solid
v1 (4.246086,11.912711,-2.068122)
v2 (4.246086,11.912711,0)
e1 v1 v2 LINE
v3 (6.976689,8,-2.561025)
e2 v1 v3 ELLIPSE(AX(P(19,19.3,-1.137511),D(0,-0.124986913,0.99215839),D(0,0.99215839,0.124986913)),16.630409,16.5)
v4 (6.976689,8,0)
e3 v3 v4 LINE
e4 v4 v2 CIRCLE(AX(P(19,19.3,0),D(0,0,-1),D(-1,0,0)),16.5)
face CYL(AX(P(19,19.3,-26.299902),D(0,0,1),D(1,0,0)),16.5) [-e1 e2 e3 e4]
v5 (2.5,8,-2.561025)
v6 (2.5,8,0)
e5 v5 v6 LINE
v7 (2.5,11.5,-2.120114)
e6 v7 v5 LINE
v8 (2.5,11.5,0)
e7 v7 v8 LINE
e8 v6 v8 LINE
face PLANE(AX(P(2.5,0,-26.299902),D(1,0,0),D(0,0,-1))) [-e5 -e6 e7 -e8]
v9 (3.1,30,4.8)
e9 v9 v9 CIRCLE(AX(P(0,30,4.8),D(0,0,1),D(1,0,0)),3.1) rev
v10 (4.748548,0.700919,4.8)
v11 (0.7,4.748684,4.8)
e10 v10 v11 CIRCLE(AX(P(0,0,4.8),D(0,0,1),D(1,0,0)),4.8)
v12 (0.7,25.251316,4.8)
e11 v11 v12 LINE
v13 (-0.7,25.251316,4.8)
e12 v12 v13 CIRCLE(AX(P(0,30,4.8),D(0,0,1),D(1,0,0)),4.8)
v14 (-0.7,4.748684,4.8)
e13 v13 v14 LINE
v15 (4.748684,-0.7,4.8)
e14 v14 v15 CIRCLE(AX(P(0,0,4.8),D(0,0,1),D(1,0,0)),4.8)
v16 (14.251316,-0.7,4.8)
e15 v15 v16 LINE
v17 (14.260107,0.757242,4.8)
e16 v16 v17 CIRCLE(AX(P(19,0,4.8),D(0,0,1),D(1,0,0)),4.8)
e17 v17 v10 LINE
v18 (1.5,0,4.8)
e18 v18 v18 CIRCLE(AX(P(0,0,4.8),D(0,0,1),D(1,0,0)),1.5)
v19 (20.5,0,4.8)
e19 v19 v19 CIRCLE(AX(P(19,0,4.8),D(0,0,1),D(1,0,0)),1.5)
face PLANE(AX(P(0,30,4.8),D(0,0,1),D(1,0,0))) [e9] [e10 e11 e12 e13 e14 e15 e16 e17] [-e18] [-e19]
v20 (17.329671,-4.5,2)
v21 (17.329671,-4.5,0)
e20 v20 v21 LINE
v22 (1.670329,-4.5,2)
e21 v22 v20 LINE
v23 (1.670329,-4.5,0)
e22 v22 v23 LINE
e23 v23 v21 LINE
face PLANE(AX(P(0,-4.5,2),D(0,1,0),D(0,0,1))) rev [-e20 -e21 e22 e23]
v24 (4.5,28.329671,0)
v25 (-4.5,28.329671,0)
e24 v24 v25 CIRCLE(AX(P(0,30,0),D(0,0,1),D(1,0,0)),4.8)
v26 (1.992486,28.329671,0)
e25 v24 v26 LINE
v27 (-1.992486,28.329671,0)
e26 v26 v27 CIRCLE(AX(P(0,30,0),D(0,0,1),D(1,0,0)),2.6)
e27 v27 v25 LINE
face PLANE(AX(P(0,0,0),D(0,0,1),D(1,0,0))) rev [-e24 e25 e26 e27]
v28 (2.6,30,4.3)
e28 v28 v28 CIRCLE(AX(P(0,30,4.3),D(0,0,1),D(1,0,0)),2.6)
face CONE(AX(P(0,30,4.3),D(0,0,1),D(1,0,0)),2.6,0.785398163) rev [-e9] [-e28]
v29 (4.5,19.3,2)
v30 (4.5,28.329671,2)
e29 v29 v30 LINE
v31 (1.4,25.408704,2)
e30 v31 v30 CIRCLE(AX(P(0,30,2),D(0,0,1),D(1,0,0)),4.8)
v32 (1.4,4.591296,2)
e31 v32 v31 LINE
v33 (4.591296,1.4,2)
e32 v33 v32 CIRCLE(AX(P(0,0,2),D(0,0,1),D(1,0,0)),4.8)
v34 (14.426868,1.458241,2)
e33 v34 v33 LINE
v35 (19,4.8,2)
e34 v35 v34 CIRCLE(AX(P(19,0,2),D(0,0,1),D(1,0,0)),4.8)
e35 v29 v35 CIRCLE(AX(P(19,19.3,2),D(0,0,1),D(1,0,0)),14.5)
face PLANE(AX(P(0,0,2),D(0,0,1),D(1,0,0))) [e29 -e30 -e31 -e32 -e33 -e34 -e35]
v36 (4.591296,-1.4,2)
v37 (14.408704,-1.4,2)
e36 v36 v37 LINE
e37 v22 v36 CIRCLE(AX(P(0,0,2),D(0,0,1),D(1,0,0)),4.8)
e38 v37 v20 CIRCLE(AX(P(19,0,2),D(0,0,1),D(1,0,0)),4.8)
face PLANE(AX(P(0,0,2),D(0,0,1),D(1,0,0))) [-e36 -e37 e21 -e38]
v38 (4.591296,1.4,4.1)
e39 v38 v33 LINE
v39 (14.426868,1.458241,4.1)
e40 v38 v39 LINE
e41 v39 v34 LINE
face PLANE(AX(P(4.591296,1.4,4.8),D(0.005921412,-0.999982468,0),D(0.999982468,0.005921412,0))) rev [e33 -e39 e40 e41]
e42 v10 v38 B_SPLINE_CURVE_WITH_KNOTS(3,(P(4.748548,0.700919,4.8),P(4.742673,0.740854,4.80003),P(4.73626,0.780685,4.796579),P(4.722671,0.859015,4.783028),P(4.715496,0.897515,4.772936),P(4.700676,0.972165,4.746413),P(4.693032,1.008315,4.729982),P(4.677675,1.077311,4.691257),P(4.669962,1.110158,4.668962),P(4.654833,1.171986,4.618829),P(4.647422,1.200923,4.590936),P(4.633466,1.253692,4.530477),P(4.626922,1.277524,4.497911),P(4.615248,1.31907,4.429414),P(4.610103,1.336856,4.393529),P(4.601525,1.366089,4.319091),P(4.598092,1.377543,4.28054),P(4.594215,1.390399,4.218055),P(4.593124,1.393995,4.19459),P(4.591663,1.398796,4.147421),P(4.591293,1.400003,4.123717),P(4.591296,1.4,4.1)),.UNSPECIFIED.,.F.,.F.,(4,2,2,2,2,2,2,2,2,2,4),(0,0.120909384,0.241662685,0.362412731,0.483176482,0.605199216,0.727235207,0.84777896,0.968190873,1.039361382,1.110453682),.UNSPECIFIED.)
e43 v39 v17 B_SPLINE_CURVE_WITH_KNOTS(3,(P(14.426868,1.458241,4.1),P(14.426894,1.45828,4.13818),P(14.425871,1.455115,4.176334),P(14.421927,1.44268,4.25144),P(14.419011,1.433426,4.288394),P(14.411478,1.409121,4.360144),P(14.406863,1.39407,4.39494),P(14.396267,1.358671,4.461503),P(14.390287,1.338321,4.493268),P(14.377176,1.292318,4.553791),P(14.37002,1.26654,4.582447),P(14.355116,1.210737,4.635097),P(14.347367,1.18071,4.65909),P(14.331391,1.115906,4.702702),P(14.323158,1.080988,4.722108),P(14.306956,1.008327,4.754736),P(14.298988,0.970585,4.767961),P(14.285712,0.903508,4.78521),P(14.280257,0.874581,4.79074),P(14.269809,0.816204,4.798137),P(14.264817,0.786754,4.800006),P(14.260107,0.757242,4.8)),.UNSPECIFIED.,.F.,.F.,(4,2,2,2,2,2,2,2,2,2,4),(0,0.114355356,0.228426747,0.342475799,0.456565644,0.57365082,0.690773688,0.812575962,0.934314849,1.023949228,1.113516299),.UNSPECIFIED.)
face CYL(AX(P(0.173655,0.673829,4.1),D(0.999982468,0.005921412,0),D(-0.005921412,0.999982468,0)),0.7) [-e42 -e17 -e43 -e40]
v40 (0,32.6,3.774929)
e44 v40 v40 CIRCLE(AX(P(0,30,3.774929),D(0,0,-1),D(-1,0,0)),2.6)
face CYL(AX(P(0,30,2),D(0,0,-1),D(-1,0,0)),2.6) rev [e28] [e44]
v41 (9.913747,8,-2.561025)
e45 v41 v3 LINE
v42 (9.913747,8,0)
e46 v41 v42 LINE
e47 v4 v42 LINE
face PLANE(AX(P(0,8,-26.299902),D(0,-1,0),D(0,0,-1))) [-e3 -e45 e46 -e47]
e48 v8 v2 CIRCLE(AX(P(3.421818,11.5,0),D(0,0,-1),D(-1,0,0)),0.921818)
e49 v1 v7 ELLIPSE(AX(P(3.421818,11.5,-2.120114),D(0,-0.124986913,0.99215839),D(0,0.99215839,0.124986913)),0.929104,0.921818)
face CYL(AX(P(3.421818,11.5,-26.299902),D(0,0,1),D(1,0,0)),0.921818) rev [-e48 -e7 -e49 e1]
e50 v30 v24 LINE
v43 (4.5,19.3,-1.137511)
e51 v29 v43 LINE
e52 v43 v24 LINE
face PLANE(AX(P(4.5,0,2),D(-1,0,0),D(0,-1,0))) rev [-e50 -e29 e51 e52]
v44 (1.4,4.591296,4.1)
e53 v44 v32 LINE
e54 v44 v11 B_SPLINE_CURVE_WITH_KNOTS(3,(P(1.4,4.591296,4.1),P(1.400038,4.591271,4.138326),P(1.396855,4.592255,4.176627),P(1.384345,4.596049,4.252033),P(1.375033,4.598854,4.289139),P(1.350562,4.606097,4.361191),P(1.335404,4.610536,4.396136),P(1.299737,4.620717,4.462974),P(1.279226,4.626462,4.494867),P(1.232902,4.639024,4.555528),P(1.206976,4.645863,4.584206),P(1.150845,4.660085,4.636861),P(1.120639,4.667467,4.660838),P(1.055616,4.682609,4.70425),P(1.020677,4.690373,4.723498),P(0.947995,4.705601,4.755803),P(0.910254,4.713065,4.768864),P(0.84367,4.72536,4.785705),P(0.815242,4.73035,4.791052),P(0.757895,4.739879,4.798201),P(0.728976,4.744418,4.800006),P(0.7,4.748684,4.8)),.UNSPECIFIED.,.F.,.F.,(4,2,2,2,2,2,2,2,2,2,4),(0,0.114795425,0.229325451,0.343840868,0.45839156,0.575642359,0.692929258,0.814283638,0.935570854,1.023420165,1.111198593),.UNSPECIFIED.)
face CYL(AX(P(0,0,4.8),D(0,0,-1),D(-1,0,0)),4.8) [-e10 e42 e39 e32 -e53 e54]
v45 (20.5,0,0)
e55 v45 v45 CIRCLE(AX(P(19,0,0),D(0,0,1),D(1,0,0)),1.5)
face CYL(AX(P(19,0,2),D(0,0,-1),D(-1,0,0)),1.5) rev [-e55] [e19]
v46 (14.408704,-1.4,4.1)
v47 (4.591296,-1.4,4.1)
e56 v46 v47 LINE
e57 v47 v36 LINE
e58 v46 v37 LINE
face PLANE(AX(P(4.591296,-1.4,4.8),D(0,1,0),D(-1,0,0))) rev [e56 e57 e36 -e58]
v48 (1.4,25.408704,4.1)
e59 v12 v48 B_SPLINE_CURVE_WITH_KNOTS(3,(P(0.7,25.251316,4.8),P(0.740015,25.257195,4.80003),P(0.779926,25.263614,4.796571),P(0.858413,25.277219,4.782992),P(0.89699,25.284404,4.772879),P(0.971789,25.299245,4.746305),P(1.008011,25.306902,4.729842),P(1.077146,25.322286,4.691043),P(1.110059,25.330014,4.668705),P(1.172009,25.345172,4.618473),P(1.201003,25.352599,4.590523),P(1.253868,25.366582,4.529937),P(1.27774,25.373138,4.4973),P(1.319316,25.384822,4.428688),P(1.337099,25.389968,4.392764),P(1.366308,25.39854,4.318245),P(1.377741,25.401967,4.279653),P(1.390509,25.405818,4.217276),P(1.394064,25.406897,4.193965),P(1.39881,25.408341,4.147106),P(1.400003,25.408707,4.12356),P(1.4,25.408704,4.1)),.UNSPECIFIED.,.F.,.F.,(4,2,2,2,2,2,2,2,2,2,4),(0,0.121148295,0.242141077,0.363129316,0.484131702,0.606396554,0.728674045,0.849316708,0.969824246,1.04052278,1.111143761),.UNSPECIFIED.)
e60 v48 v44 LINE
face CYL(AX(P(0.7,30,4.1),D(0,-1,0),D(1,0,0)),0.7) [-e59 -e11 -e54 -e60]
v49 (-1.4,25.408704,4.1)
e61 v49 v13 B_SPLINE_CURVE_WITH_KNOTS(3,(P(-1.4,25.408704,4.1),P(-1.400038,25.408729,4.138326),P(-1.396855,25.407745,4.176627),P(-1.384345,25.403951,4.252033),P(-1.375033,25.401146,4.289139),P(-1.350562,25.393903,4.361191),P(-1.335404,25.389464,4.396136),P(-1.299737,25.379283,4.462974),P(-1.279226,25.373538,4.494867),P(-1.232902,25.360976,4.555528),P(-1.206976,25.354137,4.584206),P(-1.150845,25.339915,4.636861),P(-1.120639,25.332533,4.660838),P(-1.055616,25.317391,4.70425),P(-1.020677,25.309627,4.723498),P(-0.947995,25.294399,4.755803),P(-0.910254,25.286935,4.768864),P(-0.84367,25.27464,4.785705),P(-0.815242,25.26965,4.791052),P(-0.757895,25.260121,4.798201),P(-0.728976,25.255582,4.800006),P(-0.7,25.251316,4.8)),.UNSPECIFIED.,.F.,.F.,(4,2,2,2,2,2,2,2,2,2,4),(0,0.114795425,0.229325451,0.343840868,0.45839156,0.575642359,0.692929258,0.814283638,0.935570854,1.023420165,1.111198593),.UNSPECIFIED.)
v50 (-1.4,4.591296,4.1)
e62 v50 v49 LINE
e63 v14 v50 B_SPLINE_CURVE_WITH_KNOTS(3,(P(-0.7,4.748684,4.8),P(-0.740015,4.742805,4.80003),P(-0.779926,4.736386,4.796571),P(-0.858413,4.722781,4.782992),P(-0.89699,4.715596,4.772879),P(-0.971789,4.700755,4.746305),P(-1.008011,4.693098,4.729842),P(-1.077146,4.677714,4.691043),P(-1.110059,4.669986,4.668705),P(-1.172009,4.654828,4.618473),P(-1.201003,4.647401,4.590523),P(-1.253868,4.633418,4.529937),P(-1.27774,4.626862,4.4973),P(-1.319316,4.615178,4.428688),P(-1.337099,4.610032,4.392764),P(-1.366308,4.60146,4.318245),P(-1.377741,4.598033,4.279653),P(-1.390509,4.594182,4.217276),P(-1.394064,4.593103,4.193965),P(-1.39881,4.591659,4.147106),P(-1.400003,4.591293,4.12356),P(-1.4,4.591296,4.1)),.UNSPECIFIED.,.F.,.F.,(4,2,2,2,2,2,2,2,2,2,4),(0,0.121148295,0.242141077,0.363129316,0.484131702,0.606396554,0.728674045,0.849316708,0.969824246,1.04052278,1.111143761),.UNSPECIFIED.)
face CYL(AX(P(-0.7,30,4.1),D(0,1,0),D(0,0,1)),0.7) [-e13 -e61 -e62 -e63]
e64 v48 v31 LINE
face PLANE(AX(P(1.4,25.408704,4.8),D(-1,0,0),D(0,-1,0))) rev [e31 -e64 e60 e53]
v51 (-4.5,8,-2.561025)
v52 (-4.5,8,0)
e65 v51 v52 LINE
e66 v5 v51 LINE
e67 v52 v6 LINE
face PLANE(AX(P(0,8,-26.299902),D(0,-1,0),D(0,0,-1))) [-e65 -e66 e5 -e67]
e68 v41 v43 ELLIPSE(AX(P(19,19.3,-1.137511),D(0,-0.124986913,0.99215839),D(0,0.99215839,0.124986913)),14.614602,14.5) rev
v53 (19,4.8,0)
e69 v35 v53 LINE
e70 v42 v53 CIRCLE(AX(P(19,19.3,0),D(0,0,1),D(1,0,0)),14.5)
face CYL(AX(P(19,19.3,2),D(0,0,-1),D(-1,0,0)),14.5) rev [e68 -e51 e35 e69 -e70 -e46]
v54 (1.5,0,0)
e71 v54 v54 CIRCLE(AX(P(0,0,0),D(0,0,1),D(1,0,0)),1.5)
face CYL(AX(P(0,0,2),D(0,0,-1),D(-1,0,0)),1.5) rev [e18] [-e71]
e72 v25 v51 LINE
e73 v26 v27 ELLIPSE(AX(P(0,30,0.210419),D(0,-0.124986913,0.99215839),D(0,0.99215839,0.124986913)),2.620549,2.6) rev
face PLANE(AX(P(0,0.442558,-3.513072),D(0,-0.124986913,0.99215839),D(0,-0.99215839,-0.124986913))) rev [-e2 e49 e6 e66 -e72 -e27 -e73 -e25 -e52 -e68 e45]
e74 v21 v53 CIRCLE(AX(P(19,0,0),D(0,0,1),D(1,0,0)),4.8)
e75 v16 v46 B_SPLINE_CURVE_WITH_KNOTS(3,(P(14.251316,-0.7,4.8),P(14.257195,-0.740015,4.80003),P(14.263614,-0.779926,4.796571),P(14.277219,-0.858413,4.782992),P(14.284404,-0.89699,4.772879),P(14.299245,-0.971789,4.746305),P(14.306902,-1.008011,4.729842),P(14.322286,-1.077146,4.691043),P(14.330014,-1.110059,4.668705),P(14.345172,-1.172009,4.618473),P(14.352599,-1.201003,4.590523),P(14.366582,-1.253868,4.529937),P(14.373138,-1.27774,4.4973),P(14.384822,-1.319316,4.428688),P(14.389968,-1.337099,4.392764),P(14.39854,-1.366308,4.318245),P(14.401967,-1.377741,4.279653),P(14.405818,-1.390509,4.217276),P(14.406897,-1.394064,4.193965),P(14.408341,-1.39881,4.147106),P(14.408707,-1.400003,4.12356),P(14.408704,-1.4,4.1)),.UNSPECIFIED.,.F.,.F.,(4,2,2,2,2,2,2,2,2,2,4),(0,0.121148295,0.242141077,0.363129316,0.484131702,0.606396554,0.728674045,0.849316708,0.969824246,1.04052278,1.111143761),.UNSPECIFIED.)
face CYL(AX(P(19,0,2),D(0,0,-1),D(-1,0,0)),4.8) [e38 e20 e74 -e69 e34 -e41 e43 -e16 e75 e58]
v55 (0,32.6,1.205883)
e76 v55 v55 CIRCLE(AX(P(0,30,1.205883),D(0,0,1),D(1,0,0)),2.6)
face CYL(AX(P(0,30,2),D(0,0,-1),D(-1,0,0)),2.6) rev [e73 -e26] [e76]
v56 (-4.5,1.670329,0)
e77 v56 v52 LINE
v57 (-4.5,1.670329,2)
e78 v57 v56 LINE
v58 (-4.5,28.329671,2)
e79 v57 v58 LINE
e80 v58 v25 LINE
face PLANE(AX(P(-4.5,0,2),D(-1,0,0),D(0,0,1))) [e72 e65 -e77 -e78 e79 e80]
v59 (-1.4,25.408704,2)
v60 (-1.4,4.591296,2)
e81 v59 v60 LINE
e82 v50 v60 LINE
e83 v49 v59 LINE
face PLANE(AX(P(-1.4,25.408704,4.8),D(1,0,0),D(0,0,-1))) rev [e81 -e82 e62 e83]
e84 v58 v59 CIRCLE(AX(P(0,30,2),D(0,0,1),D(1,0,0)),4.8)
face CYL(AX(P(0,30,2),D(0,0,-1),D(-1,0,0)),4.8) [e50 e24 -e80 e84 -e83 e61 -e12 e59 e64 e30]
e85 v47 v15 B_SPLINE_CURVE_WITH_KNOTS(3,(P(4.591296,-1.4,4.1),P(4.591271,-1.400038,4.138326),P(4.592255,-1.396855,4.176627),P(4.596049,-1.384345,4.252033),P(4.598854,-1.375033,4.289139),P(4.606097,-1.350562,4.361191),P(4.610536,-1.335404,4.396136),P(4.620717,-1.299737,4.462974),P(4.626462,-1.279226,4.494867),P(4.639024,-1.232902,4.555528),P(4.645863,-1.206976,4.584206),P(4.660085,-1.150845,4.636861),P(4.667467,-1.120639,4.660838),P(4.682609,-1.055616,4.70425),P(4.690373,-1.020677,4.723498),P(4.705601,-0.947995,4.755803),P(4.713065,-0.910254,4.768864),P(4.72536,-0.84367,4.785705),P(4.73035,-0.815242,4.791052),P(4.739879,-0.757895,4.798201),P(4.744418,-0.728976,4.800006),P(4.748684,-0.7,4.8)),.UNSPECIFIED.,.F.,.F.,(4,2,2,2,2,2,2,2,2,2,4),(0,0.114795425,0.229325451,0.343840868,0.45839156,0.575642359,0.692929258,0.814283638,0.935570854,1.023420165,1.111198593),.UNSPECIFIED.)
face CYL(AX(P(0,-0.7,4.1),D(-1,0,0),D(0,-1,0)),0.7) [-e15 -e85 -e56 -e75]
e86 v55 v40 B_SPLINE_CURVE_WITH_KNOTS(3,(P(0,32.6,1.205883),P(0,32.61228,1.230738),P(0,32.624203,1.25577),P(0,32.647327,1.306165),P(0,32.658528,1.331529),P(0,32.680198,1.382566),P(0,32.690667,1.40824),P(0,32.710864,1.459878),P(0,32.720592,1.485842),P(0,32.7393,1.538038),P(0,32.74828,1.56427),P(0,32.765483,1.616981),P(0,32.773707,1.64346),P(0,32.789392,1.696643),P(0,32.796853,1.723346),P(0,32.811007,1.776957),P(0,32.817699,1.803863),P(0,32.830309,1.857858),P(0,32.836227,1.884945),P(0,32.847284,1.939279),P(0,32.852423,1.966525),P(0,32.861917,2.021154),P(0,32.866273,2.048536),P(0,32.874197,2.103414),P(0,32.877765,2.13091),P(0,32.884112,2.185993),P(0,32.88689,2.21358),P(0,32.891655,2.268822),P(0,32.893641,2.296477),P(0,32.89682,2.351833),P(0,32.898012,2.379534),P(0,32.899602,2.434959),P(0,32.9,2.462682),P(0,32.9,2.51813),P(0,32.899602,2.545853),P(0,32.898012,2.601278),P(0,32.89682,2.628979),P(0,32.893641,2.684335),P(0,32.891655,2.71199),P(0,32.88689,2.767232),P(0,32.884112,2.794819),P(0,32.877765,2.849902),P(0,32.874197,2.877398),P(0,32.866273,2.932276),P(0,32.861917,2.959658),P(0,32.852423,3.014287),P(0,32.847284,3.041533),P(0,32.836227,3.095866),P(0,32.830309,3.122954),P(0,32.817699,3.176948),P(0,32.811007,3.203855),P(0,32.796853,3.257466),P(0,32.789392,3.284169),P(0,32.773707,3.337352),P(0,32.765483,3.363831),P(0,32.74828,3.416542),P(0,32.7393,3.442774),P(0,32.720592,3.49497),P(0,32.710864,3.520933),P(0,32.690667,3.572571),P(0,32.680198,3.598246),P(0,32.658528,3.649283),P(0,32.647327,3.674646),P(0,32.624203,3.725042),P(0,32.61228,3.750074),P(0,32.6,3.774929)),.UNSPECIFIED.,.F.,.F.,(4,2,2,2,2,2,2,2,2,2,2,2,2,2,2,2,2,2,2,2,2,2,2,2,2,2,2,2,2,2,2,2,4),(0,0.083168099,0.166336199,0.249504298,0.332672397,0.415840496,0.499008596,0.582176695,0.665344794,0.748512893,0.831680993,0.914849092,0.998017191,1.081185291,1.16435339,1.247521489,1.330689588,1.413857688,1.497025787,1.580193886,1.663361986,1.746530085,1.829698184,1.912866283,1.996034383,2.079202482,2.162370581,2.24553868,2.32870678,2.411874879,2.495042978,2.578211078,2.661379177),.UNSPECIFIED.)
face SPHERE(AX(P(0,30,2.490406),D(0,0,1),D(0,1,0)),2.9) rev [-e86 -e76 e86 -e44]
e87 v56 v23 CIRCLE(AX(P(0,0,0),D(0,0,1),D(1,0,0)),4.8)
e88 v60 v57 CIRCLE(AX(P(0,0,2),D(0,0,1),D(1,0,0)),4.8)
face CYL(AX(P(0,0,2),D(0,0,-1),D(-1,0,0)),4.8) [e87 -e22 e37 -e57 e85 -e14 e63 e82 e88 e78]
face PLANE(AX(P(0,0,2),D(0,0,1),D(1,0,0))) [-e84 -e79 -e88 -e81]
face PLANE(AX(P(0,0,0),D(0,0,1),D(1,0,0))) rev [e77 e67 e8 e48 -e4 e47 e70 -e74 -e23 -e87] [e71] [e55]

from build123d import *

# Parameters (mm, degrees)
SKETCH_1_R            = 1.5
SKETCH_1_R_2          = 2.6
EXTRUDE_1_DEPTH       = 2
SKETCH_2_R            = 1.5
SKETCH_2_R_2          = 2.6
EXTRUDE_2_DEPTH       = 2.8
FILLET_1_R            = 0.7
EXTRUDE_START         = -4.5
EXTRUDE_3_DEPTH       = 7
EXTRUDE_START_2       = 2.5
EXTRUDE_3_2_DEPTH     = 7.413746647
EXTRUDE_START_3       = -4
EXTRUDE_3_3_OUTLINE_R = 1.5
EXTRUDE_3_3_DEPTH     = 4
CHAMFER_1_SIZE        = 0.5


with BuildPart() as part:
    # 草图1 → 凸台-拉伸1 (new body)
    with BuildSketch(Plane.XY):
        with BuildLine():
            Line((4.5, 19.3), (4.5, 28.329670691))
            ThreePointArc((4.5, 28.329670691), (0, 34.8), (-4.5, 28.329670691))
            Line((-4.5, 28.329670691), (-4.5, 1.670329309))
            ThreePointArc((-4.5, 1.670329309), (-3.39411255, -3.39411255), (1.670329309, -4.5))
            Line((1.670329309, -4.5), (17.329670691, -4.5))
            ThreePointArc((17.329670691, -4.5), (23.724404724, -0.848528137), (19, 4.8))
            ThreePointArc((19, 4.8), (8.746951673, 9.046951673), (4.5, 19.3))
        make_face()
        Circle(SKETCH_1_R, mode=Mode.SUBTRACT)
        with Locations((19, 0)):
            Circle(SKETCH_1_R, mode=Mode.SUBTRACT)
        with Locations((0, 30)):
            Circle(SKETCH_1_R_2, mode=Mode.SUBTRACT)
    extrude(amount=EXTRUDE_1_DEPTH)

    # 草图2 → 凸台-拉伸2 (add)
    with BuildSketch(Plane.XY.offset(2)):
        with BuildLine():
            Line((-1.4, 25.408703887), (-1.4, 4.591296113))
            ThreePointArc((-1.4, 4.591296113), (-3.39411255, -3.39411255), (4.591296113, -1.4))
            Line((4.591296113, -1.4), (14.408703887, -1.4))
            ThreePointArc((14.408703887, -1.4), (23.799903071, -0.030504201), (14.426868498, 1.458241497))
            Line((14.426868498, 1.458241497), (4.591296113, 1.4))
            ThreePointArc((4.591296113, 1.4), (3.39411255, 3.39411255), (1.4, 4.591296113))
            Line((1.4, 4.591296113), (1.4, 25.408703887))
            ThreePointArc((1.4, 25.408703887), (0, 34.8), (-1.4, 25.408703887))
        make_face()
        Circle(SKETCH_2_R, mode=Mode.SUBTRACT)
        with Locations((0, 30)):
            Circle(SKETCH_2_R_2, mode=Mode.SUBTRACT)
        with Locations((19, 0)):
            Circle(SKETCH_2_R, mode=Mode.SUBTRACT)
    extrude(amount=EXTRUDE_2_DEPTH)

    # 圆角1
    fillet_1_edges = [part.edges().sort_by_distance(p)[0] for p in [
        (-1.4, 15, 4.8),
        (9.5, -1.4, 4.8),
        (9.509082305, 1.429120748, 4.8),
        (1.4, 15, 4.8),
    ]]
    fillet(fillet_1_edges, radius=FILLET_1_R)

    # 凸台-拉伸3: read off the stored shape, not the designer's step
    # 凸台-拉伸3 outline → 凸台-拉伸3 (add)
    with BuildSketch(Plane.YZ.offset(EXTRUDE_START)):
        Polygon((28.329670691, 0), (8, 0), (8, -2.561025334), align=None)
    extrude(amount=EXTRUDE_3_DEPTH)

    # Extrude 3 2 outline → Extrude 3 2 (add)
    with BuildSketch(Plane.YZ.offset(EXTRUDE_START_2)):
        Polygon((28.329670691, 0), (8, 0), (8, -2.561025334), align=None)
    extrude(amount=EXTRUDE_3_2_DEPTH)

    # Extrude 3 3 outline → Extrude 3 3 (cut)
    # profile 1 of 3: a face of its own
    with BuildSketch(Plane.XY.offset(EXTRUDE_START_3)):
        with BuildLine():
            ThreePointArc((4.5, 19.3), (5.923290291, 13.035044837), (9.913746647, 8))
            Line((9.913746647, 8), (9.913746647, 28.329670691))
            Line((9.913746647, 28.329670691), (4.5, 28.329670691))
            Line((4.5, 28.329670691), (4.5, 19.3))
        make_face()
    # profile 2 of 3: a face of its own
    with BuildSketch(Plane.XY.offset(EXTRUDE_START_3)):
        with BuildLine():
            ThreePointArc((6.976689308, 8), (5.469210572, 9.857132985), (4.246086412, 11.912711334))
            ThreePointArc((4.246086412, 11.912711334), (3.209776536, 12.39709927), (2.5, 11.5))
            Line((2.5, 11.5), (2.5, 8))
            Line((2.5, 8), (-4.5, 8))
            Line((-4.5, 8), (-4.5, 1.670329309))
            ThreePointArc((-4.5, 1.670329309), (-3.39411255, -3.39411255), (1.670329309, -4.5))
            Line((1.670329309, -4.5), (17.329670691, -4.5))
            ThreePointArc((17.329670691, -4.5), (23.724404724, -0.848528137), (19, 4.8))
            ThreePointArc((19, 4.8), (14.183362168, 5.62337761), (9.913746647, 8))
            Line((9.913746647, 8), (6.976689308, 8))
        make_face()
        Circle(EXTRUDE_3_3_OUTLINE_R, mode=Mode.SUBTRACT)
        with Locations((19, 0)):
            Circle(EXTRUDE_3_3_OUTLINE_R, mode=Mode.SUBTRACT)
    # profile 3 of 3: a face of its own
    with BuildSketch(Plane.XY.offset(EXTRUDE_START_3)):
        with BuildLine():
            Line((1.992485884, 28.329670691), (-1.992485884, 28.329670691))
            ThreePointArc((-1.992485884, 28.329670691), (0, 27.4), (1.992485884, 28.329670691))
        make_face()
    extrude(amount=EXTRUDE_3_3_DEPTH, mode=Mode.SUBTRACT)

    # 草图6 → 切除-旋转1 (revolve, cut)
    with BuildSketch(Plane(origin=(0, 0, 0), x_dir=(0, 0, -1), z_dir=(1, 0, 0))):
        with BuildLine():
            Line((-5.3904059, 30), (0.4095941, 30))
            ThreePointArc((0.4095941, 30), (-2.4904059, 32.9), (-5.3904059, 30))
        make_face()
    revolve(axis=Axis((0, 30, 4.8), (0, 0, -1)), mode=Mode.SUBTRACT)

    # 倒角1
    chamfer_1_edges = [part.edges().sort_by_distance(p)[0] for p in [
        (-2.6, 30, 4.8),
    ]]
    chamfer(chamfer_1_edges, length=CHAMFER_1_SIZE)


solid = part.part
